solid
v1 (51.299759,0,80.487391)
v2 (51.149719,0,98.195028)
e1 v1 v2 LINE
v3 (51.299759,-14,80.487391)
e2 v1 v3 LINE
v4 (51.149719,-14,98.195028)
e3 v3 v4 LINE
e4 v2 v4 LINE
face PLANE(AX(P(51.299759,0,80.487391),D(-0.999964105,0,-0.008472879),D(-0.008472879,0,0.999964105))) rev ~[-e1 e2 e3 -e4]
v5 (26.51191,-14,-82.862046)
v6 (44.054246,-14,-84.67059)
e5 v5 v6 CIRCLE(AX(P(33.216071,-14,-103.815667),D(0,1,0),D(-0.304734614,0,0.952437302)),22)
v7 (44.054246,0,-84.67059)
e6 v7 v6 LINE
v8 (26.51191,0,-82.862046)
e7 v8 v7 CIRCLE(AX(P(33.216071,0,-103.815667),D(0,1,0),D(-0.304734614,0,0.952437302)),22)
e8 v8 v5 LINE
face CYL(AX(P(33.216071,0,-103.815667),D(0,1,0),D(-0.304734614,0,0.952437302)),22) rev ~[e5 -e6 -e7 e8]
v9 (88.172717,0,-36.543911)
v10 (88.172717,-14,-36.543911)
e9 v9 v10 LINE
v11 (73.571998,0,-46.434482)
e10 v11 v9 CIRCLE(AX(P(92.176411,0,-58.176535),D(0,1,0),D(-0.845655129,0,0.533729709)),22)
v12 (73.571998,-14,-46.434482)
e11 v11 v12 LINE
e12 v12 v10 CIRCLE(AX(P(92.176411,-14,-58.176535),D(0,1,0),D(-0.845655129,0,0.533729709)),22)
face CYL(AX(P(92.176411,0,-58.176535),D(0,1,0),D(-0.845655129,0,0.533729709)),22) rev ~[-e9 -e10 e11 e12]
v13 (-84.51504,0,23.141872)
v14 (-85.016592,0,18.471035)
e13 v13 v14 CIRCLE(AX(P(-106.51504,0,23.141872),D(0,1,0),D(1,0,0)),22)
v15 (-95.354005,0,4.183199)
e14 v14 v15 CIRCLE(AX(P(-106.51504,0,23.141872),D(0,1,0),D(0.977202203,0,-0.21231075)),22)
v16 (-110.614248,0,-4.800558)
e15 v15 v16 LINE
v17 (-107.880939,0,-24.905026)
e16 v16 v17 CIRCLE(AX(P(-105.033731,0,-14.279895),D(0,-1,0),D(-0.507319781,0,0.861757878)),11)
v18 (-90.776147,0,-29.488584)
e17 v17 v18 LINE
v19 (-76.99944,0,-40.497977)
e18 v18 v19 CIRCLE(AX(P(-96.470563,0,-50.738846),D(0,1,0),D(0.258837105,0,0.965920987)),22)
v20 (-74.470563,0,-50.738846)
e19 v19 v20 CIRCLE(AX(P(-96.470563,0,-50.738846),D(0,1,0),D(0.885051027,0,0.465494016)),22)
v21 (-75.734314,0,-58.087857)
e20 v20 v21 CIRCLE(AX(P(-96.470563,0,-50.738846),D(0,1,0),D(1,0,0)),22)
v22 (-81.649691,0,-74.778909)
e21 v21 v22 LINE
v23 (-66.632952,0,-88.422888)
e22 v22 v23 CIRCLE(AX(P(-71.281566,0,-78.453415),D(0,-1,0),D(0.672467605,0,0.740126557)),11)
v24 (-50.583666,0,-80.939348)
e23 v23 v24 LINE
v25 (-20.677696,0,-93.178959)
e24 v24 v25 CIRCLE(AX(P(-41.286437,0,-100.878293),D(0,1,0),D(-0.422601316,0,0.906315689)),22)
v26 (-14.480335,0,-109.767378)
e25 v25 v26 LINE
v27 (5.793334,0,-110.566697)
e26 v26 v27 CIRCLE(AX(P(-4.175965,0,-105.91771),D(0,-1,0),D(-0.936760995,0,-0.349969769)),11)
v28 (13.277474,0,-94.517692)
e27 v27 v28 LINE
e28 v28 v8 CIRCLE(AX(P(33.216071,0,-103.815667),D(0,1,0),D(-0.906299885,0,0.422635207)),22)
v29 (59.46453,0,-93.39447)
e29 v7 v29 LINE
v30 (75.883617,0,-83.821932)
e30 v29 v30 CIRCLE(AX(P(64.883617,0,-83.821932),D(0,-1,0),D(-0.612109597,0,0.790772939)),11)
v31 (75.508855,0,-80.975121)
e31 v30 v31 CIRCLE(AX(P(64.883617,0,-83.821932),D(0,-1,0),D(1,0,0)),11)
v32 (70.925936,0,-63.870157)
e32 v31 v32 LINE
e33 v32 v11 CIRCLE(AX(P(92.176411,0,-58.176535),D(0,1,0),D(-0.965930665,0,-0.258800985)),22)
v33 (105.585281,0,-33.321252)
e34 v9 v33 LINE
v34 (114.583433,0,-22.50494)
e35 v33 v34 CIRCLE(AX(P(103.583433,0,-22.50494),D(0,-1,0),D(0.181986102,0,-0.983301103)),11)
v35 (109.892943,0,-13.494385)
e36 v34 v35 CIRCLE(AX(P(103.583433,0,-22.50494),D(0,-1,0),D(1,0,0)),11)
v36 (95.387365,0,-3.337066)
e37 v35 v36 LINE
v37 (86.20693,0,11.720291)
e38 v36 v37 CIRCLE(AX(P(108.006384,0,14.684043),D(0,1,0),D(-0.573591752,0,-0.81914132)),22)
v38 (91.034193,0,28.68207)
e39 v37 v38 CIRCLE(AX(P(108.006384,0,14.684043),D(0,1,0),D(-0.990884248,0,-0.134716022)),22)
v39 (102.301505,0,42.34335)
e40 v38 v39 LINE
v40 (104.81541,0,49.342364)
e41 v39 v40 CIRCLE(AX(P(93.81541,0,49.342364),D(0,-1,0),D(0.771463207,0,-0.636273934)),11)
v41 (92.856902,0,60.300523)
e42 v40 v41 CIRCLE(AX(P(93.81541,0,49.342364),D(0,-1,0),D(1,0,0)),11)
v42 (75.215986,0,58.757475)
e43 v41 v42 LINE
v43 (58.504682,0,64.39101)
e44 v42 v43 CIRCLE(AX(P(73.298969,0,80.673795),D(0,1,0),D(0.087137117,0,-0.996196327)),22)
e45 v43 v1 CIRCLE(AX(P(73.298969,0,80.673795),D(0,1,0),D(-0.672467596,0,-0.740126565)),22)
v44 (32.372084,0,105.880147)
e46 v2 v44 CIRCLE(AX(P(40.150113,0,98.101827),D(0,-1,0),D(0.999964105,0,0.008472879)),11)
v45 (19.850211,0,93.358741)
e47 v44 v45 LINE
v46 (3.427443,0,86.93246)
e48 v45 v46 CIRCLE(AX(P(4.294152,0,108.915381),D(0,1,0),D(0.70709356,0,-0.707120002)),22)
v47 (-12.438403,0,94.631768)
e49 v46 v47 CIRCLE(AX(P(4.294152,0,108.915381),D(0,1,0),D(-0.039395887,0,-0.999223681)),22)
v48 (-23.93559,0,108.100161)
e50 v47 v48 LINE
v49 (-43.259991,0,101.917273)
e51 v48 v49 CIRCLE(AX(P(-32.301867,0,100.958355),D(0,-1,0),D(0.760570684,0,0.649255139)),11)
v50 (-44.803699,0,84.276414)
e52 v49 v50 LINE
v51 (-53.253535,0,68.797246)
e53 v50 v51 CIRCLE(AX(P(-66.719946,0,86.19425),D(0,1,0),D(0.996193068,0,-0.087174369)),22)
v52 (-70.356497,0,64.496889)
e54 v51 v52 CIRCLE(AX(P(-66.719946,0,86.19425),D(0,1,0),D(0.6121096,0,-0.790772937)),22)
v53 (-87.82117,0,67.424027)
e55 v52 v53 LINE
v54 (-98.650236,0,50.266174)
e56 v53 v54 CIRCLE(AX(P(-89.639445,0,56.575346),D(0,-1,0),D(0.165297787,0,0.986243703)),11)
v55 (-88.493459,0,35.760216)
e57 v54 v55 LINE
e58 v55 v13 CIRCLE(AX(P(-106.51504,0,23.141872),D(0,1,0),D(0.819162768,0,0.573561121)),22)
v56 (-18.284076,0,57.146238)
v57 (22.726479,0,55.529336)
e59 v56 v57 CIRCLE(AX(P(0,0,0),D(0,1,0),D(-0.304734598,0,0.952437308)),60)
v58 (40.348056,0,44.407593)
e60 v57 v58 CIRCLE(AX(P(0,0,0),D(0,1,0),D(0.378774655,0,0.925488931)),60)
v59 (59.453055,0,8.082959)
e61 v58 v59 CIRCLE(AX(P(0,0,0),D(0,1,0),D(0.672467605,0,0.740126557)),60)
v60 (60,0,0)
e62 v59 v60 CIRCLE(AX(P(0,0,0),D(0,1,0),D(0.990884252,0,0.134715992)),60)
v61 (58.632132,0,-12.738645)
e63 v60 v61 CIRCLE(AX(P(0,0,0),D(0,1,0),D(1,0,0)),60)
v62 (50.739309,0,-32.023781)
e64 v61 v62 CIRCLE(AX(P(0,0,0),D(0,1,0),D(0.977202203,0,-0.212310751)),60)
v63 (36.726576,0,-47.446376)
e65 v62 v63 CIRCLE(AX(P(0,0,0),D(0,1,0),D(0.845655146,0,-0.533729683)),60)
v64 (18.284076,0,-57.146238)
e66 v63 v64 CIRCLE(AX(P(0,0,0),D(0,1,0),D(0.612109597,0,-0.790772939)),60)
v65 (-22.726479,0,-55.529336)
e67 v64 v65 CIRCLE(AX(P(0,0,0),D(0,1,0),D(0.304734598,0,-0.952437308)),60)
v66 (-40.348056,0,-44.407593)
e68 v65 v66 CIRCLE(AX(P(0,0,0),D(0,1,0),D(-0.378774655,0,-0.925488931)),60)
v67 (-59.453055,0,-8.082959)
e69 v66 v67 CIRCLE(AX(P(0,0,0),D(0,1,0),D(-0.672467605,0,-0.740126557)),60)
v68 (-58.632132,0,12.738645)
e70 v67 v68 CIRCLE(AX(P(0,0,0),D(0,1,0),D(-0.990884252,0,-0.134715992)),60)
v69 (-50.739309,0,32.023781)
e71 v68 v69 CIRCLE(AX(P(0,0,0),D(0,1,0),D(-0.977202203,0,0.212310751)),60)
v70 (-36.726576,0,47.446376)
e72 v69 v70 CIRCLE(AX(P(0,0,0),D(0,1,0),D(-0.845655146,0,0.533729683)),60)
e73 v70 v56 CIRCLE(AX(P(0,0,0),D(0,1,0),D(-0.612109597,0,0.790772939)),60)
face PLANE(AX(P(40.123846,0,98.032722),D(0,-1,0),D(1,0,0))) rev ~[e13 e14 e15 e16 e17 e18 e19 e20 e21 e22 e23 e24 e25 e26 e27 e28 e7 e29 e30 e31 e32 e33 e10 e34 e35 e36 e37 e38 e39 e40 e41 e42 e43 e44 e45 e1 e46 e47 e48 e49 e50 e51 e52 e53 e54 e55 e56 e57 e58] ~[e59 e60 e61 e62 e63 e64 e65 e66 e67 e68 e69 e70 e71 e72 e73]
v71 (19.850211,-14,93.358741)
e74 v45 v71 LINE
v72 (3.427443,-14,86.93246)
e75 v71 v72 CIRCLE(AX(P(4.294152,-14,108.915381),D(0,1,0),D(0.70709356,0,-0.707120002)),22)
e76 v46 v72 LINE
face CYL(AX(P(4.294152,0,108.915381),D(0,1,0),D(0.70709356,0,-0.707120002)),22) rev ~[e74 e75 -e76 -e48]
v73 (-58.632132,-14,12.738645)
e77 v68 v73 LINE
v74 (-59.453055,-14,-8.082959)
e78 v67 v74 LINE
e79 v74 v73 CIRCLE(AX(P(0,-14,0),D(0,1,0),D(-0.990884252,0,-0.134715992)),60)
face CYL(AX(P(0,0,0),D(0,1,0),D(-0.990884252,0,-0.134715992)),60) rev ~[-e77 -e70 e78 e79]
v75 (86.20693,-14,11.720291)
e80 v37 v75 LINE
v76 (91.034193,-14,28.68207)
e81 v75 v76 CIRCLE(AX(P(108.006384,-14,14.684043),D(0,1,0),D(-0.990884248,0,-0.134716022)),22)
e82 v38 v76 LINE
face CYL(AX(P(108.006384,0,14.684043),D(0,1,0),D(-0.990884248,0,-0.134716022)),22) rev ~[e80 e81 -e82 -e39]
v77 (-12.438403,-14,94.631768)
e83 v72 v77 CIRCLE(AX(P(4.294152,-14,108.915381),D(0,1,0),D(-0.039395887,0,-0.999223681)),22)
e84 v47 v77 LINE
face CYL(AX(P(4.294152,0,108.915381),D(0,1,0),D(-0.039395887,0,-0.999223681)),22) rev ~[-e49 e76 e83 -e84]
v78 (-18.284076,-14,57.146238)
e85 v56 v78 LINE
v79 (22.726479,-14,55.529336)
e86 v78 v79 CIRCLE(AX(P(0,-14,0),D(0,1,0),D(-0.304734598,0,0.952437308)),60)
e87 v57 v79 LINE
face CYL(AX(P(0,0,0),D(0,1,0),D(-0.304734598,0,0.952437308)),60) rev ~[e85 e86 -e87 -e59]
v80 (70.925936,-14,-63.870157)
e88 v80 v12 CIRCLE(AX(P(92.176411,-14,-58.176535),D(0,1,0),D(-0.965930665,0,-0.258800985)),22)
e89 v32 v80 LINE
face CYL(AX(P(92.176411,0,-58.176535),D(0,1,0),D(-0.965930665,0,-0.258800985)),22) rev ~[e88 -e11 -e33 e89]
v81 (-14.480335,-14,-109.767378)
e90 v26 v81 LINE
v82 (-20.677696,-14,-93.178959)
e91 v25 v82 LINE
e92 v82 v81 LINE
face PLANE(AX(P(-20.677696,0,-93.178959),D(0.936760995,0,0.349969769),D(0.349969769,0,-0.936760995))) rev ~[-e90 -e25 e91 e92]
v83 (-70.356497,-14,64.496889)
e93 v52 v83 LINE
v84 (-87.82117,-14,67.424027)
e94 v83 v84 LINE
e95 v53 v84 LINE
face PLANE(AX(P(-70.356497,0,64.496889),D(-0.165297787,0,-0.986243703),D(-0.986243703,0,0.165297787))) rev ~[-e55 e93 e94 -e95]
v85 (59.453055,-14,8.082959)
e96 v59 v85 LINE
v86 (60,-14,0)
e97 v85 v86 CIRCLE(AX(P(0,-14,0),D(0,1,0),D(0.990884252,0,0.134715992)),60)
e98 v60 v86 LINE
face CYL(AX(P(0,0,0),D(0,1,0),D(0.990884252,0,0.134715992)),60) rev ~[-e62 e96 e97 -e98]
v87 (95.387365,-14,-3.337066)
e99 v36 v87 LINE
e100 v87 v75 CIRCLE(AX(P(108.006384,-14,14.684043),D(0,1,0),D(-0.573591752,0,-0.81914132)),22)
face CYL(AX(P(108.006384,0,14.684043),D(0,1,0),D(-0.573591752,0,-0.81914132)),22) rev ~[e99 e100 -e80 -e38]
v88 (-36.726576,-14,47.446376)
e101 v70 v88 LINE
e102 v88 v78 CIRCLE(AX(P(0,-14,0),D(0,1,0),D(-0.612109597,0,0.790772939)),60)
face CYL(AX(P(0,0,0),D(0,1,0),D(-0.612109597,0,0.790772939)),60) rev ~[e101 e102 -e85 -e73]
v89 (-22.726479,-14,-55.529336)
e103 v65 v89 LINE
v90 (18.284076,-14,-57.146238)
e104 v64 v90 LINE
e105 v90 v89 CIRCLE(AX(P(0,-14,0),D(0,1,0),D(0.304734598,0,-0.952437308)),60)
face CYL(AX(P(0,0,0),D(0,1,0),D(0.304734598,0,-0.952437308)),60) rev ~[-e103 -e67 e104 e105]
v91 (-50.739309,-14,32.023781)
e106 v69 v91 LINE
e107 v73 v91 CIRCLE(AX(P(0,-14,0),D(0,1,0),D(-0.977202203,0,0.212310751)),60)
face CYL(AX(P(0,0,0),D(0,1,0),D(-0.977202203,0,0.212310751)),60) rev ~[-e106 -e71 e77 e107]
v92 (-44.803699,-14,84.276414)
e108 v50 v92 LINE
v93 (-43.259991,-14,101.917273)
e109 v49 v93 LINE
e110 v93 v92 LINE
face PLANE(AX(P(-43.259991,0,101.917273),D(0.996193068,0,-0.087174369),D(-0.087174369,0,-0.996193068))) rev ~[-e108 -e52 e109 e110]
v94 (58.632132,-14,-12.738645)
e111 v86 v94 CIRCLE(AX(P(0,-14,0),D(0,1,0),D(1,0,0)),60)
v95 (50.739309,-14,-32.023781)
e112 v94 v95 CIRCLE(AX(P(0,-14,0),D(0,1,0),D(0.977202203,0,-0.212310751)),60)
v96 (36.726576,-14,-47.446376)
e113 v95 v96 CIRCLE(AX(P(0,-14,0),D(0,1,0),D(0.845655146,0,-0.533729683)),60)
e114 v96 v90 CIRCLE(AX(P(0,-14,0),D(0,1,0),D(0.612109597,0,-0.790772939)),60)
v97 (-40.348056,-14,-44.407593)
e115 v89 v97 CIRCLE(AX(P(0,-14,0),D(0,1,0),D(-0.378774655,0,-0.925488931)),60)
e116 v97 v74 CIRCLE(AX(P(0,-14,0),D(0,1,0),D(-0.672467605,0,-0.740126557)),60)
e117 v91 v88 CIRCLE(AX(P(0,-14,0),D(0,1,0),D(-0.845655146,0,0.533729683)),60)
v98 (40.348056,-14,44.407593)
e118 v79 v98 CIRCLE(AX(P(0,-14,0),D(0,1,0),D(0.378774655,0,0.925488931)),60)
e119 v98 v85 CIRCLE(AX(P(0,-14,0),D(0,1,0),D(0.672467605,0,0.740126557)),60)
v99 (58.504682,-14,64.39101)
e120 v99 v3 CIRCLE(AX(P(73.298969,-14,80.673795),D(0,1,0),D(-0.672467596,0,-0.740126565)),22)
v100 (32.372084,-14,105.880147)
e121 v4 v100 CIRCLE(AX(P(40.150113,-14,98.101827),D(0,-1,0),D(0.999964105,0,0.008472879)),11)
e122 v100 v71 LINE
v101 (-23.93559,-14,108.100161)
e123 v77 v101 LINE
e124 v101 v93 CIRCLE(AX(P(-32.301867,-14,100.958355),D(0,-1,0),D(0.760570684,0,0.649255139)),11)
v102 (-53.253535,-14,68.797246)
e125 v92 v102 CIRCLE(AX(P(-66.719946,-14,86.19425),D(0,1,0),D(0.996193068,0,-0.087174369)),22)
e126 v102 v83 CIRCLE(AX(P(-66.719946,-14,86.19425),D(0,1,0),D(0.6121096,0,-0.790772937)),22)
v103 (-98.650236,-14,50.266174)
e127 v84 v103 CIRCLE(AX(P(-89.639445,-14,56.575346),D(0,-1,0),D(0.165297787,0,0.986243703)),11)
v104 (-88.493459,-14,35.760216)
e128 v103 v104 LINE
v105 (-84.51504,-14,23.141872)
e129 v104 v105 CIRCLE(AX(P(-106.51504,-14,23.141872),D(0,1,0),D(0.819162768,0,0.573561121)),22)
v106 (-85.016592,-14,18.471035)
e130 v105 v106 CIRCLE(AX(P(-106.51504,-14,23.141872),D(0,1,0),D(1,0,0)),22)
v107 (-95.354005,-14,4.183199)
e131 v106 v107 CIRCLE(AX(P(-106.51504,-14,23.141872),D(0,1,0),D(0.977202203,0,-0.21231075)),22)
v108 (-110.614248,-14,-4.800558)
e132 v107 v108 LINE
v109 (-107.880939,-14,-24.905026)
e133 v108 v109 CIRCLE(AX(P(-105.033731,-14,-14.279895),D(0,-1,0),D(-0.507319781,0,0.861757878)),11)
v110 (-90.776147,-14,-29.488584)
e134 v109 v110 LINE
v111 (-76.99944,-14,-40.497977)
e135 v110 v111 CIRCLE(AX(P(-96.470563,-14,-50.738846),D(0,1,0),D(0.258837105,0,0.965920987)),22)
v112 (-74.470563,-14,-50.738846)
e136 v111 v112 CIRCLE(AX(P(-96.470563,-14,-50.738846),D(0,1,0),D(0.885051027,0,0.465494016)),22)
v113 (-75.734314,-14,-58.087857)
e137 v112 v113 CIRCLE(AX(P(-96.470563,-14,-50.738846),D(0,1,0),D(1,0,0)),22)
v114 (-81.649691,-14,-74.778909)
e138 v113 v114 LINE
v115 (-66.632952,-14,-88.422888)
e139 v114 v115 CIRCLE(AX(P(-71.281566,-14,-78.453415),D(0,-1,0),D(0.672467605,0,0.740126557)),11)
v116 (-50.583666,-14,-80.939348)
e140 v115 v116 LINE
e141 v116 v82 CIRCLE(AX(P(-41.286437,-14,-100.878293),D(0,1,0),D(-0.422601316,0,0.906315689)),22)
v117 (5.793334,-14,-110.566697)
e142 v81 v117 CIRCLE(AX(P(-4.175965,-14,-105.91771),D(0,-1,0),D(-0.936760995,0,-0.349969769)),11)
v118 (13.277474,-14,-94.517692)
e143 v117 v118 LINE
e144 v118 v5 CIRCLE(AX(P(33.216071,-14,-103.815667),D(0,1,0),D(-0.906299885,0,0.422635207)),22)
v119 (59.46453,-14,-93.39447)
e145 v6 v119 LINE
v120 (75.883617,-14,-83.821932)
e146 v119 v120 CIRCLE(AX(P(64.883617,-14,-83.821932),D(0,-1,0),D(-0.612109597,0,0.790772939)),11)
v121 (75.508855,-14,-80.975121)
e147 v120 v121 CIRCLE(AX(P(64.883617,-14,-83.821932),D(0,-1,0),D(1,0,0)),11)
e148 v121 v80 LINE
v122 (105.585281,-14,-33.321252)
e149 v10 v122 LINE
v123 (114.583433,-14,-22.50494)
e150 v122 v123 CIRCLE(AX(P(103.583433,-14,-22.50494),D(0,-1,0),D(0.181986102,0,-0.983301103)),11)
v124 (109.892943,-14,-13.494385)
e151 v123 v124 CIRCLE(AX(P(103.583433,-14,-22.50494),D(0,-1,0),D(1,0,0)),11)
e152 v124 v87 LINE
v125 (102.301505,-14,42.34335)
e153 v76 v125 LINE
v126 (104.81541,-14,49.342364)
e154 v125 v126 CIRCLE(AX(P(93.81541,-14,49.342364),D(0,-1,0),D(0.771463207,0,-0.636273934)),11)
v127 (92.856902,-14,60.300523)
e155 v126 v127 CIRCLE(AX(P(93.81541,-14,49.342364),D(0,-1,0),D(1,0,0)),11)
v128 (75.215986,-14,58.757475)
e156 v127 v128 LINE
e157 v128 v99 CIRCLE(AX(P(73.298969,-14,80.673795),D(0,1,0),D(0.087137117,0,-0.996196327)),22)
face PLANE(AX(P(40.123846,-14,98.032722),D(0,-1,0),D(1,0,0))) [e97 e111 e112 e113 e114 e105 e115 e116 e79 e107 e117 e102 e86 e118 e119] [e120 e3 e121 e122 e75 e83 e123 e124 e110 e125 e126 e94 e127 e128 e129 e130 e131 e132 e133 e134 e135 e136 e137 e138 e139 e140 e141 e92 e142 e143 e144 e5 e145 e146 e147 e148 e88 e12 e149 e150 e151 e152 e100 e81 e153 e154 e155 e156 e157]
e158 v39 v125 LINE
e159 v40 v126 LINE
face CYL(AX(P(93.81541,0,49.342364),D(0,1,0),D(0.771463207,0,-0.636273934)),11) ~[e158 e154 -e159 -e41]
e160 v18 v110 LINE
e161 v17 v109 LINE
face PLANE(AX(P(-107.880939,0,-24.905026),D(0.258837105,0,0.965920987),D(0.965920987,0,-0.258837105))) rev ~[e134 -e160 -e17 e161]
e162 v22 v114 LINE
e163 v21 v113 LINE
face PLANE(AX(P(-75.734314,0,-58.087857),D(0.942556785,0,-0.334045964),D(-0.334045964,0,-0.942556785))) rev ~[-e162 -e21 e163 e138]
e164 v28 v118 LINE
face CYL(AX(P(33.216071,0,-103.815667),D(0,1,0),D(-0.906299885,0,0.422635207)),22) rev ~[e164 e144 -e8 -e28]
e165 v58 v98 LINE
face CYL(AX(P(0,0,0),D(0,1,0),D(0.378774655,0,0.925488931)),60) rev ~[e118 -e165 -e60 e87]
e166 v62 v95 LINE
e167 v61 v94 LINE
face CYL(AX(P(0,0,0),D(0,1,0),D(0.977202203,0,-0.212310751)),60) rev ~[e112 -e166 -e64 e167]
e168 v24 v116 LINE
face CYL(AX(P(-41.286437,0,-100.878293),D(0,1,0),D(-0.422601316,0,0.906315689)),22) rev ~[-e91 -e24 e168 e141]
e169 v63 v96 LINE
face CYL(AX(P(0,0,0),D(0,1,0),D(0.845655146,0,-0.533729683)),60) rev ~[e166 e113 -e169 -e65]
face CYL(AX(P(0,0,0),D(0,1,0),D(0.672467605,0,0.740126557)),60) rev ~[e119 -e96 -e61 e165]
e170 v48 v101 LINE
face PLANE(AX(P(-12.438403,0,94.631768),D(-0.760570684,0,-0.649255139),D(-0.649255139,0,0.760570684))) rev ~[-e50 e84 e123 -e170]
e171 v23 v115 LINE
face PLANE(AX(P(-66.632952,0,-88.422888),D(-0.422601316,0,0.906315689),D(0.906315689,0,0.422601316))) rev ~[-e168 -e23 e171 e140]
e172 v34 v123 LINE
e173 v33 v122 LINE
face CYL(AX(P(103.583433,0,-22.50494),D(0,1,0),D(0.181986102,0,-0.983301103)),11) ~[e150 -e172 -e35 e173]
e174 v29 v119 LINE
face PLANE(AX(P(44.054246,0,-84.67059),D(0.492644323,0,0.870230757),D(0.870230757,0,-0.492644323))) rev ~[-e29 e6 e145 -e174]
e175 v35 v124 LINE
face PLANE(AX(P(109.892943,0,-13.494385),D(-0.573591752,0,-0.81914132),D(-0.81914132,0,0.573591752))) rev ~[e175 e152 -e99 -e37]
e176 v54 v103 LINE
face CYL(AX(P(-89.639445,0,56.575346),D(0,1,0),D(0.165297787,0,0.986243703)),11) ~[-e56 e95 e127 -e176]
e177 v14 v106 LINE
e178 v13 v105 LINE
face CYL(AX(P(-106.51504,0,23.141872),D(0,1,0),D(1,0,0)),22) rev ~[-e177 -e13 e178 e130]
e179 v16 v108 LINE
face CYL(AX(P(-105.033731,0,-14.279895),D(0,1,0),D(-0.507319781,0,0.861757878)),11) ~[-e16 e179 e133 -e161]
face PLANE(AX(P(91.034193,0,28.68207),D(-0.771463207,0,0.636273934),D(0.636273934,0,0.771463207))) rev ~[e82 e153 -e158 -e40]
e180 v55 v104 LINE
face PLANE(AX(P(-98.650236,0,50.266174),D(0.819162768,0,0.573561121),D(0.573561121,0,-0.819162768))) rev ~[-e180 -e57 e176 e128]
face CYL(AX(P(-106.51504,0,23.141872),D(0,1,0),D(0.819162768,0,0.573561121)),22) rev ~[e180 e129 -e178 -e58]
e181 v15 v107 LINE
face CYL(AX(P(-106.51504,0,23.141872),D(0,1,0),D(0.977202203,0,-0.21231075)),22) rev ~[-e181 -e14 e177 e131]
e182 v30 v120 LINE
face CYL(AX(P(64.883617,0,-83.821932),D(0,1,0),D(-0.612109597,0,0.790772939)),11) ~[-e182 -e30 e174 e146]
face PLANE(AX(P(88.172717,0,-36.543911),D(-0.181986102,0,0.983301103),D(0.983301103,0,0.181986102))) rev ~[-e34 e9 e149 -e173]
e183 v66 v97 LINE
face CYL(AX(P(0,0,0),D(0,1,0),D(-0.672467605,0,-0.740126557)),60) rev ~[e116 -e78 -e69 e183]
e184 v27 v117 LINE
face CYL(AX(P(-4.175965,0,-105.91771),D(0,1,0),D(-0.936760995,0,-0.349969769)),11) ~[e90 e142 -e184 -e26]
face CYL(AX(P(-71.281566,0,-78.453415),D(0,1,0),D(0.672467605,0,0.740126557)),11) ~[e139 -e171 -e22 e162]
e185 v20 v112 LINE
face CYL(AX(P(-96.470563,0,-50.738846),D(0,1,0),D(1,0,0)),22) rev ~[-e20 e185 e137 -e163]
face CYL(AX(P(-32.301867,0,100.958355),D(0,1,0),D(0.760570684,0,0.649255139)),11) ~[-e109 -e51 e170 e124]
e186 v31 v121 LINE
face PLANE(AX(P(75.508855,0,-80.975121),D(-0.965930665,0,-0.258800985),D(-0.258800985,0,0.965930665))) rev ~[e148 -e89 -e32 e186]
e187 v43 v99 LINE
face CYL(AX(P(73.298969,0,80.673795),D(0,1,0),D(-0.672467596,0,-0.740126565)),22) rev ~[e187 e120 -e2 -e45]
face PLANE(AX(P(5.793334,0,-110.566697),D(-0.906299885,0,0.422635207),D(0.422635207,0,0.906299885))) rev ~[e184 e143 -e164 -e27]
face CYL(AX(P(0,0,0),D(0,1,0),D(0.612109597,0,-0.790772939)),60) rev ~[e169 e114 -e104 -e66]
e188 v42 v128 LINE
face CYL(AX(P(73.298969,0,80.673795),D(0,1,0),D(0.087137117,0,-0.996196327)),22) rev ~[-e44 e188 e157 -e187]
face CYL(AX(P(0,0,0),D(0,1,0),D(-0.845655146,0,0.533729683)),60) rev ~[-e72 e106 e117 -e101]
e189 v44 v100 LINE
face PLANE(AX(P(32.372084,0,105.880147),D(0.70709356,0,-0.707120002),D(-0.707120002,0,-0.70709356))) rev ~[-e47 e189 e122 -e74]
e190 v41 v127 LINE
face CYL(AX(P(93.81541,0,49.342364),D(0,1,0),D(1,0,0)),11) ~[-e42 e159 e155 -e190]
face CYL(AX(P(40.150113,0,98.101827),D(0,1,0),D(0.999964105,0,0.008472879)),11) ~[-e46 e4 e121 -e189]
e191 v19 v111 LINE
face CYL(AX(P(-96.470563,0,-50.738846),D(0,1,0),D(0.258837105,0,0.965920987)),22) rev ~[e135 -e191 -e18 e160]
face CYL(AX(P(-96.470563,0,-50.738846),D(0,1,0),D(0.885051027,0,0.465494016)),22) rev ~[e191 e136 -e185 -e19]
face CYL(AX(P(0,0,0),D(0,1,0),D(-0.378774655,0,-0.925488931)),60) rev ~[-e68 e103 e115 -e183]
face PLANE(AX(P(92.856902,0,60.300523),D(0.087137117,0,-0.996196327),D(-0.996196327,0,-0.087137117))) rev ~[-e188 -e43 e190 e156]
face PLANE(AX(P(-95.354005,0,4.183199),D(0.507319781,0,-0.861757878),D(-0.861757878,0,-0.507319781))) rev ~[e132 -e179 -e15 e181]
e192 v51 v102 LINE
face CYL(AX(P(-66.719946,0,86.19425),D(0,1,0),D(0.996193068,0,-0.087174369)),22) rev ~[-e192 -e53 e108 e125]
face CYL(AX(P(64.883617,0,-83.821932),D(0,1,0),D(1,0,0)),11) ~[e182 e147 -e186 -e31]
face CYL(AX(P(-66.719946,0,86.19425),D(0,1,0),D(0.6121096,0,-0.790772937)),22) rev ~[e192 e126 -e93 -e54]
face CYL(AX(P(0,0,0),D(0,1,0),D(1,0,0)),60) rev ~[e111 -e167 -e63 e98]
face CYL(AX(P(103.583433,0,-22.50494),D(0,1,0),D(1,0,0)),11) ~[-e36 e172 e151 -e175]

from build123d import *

# Parameters (mm, degrees)
F1_DEPTH = 14


# Not quite as in the source:
# - ends of sketch curves that miss each other by under 0.0002 mm in the source are joined


with BuildPart() as f1:
    # F0 (on Front) → F1 (new body)
    with BuildSketch(Plane.XZ):
        with BuildLine():
            ThreePointArc((32.3720842786, 105.8801466631), (29.3660148862, 95.9331361741), (35.9835922354, 87.9214484062))
            ThreePointArc((35.9835922354, 87.9214484062), (46.2807034104, 88.9685979346), (51.1501134416, 98.1018266427))
            ThreePointArc((51.1501134416, 98.1018266427), (51.1500147285, 98.1484278976), (51.1497185912, 98.1950283161))
            ThreePointArc((51.1497185912, 98.1950283161), (44.3166346477, 108.2822048792), (32.3720842786, 105.8801466631))
        make_face()
        with BuildLine():
            ThreePointArc((32.9533949945, 80.5175369614), (46.4344825558, 73.5719975927), (58.5046818367, 64.3910102669))
            ThreePointArc((58.5046818367, 64.3910102669), (53.2187863313, 71.68567665), (51.2997586494, 80.4873913517))
            Line((51.2997586494, 80.4873913517), (51.1497185912, 98.1950283161))
            ThreePointArc((51.1497185912, 98.1950283161), (51.1500147285, 98.1484278976), (51.1501134416, 98.1018266427))
            ThreePointArc((51.1501134416, 98.1018266427), (46.2807034104, 88.9685979346), (35.9835922354, 87.9214484062))
            Line((35.9835922354, 87.9214484062), (32.9533949945, 80.5175369614))
        make_face()
        with BuildLine():
            ThreePointArc((3.4274426795, 86.9324602015), (18.4710353665, 85.0165916306), (32.9533949945, 80.5175369614))
            Line((32.9533949945, 80.5175369614), (35.9835922354, 87.9214484062))
            ThreePointArc((35.9835922354, 87.9214484062), (29.3660148862, 95.9331361741), (32.3720842786, 105.8801466631))
            Line((32.3720842786, 105.8801466631), (19.8502105167, 93.3587411362))
            ThreePointArc((19.8502105167, 93.3587411362), (12.3109167385, 88.4280317588), (3.4274426795, 86.9324602015))
        make_face()
        with BuildLine():
            Line((22.7264793065, 55.5293358355), (32.9533949945, 80.5175369614))
            ThreePointArc((32.9533949945, 80.5175369614), (18.4710353665, 85.0165916306), (3.4274426795, 86.9324602015))
            Line((3.4274426795, 86.9324602015), (2.3637534996, 59.9534208315))
            ThreePointArc((2.3637534996, 59.9534208315), (12.7386450449, 58.6321321668), (22.7264793065, 55.5293358355))
        make_face()
        with BuildLine():
            Line((40.348056302, 44.407593412), (58.5046816379, 64.3910104474))
            ThreePointArc((58.5046816379, 64.3910104474), (46.4344825558, 73.5719975927), (32.9533949945, 80.5175369614))
            Line((32.9533949945, 80.5175369614), (22.7264793065, 55.5293358355))
            ThreePointArc((22.7264793065, 55.5293358355), (32.0237809946, 50.739308734), (40.348056302, 44.407593412))
        make_face()
        with BuildLine():
            ThreePointArc((58.5046818367, 64.3910102669), (68.7972457691, 53.2535348554), (76.9994402387, 40.4979777634))
            Line((76.9994402387, 40.4979777634), (84.0798485365, 44.2219297416))
            ThreePointArc((84.0798485365, 44.2219297416), (84.1603038112, 54.6129353624), (92.8569016607, 60.3005233139))
            Line((92.8569016607, 60.3005233139), (75.2159855194, 58.7574754942))
            ThreePointArc((75.2159855194, 58.7574754942), (66.2711525981, 59.8264975753), (58.5046818367, 64.3910102669))
        make_face()
        with BuildLine():
            ThreePointArc((92.8569016607, 60.3005233139), (84.1603038112, 54.6129353624), (84.0798485365, 44.2219297416))
            ThreePointArc((84.0798485365, 44.2219297416), (92.687333506, 38.4003600768), (102.3015052283, 42.3433504341))
            ThreePointArc((102.3015052283, 42.3433504341), (104.1678745826, 45.6239667523), (104.815409946, 49.3423637117))
            ThreePointArc((104.815409946, 49.3423637117), (101.2469780464, 57.4523449428), (92.8569016607, 60.3005233139))
        make_face()
        with BuildLine():
            ThreePointArc((76.9994402387, 40.4979777634), (82.8620458637, 26.5119096875), (86.2069300455, 11.7202906163))
            ThreePointArc((86.2069300455, 11.7202906163), (86.8466202271, 20.7060376023), (91.0341929436, 28.6820696464))
            Line((91.0341929436, 28.6820696464), (102.3015052283, 42.3433504341))
            ThreePointArc((102.3015052283, 42.3433504341), (92.687333506, 38.4003600768), (84.0798485365, 44.2219297416))
            Line((84.0798485365, 44.2219297416), (76.9994402387, 40.4979777634))
        make_face()
        with BuildLine():
            Line((53.1030622336, 27.9296398368), (76.9994402387, 40.4979777634))
            ThreePointArc((76.9994402387, 40.4979777634), (68.7972457691, 53.2535348554), (58.5046818367, 64.3910102669))
            Line((58.5046818367, 64.3910102669), (40.348056302, 44.407593412))
            ThreePointArc((40.348056302, 44.407593412), (47.4463763358, 36.7265758355), (53.1030622336, 27.9296398368))
        make_face()
        with BuildLine():
            Line((59.4530551421, 8.0829594997), (86.206929956, 11.7202912746))
            ThreePointArc((86.206929956, 11.7202912746), (82.8620458637, 26.5119096875), (76.9994402387, 40.4979777634))
            Line((76.9994402387, 40.4979777634), (53.1030622336, 27.9296398368))
            ThreePointArc((53.1030622336, 27.9296398368), (57.1462384569, 18.2840758647), (59.4530551421, 8.0829594997))
        make_face()
        with BuildLine():
            ThreePointArc((85.0165916418, -18.4710353151), (86.5027267571, -9.2886093459), (87, 0))
            ThreePointArc((87, 0), (86.8015060755, 5.8735460346), (86.2069300455, 11.7202906163))
            Line((86.2069300455, 11.7202906163), (59.4530551421, 8.0829594997))
            ThreePointArc((59.4530551421, 8.0829594997), (59.8631076228, 4.0507216317), (60, 0))
            ThreePointArc((60, 0), (59.657052936, -6.40593748), (58.6321321668, -12.7386450449))
            Line((58.6321321668, -12.7386450449), (85.0165916418, -18.4710353151))
        make_face()
        with BuildLine():
            ThreePointArc((86.2069300455, 11.7202906163), (86.8015060755, 5.8735460346), (87, 0))
            ThreePointArc((87, 0), (86.5027267571, -9.2886093459), (85.0165916418, -18.4710353151))
            Line((85.0165916418, -18.4710353151), (92.834209264, -20.169521321))
            ThreePointArc((92.834209264, -20.169521321), (99.5750512453, -12.2612648605), (109.8929427662, -13.4943850596))
            Line((109.8929427662, -13.4943850596), (95.3873649649, -3.3370659482))
            ThreePointArc((95.3873649649, -3.3370659482), (89.2223796623, 3.2314800802), (86.2069300455, 11.7202906163))
        make_face()
        with BuildLine():
            ThreePointArc((109.8929427662, -13.4943850596), (99.5750512453, -12.2612648605), (92.834209264, -20.169521321))
            ThreePointArc((92.834209264, -20.169521321), (95.6858924447, -30.1618871019), (105.5852806145, -33.32125171))
            ThreePointArc((105.5852806145, -33.32125171), (112.0398014596, -29.5398412019), (114.5834334946, -22.5049395793))
            ThreePointArc((114.5834334946, -22.5049395793), (113.3406001425, -17.4257960485), (109.8929427662, -13.4943850596))
        make_face()
        with BuildLine():
            Line((92.834209264, -20.169521321), (85.0165916418, -18.4710353151))
            ThreePointArc((85.0165916418, -18.4710353151), (80.5175370893, -32.953394682), (73.5719980248, -46.4344818712))
            ThreePointArc((73.5719980248, -46.4344818712), (79.8379557996, -39.9621860052), (88.1727166272, -36.5439112122))
            Line((88.1727166272, -36.5439112122), (105.5852806145, -33.32125171))
            ThreePointArc((105.5852806145, -33.32125171), (95.6858924447, -30.1618871019), (92.834209264, -20.169521321))
        make_face()
        with BuildLine():
            ThreePointArc((73.5719980248, -46.4344818712), (80.5175370893, -32.953394682), (85.0165916418, -18.4710353151))
            Line((85.0165916418, -18.4710353151), (58.6321321668, -12.7386450449))
            ThreePointArc((58.6321321668, -12.7386450449), (55.5293358355, -22.7264793065), (50.739308734, -32.0237809946))
            Line((50.739308734, -32.0237809946), (73.5719980248, -46.4344818712))
        make_face()
        with BuildLine():
            ThreePointArc((53.2535349615, -68.7972456869), (64.3910106745, -58.5046813881), (73.5719980248, -46.4344818712))
            Line((73.5719980248, -46.4344818712), (50.739308734, -32.0237809946))
            ThreePointArc((50.739308734, -32.0237809946), (44.407593412, -40.348056302), (36.7265758355, -47.4463763358))
            Line((36.7265758355, -47.4463763358), (53.2535349615, -68.7972456869))
        make_face()
        with BuildLine():
            ThreePointArc((70.9259362309, -63.8701571461), (70.4254635991, -54.875582133), (73.5719980248, -46.4344818712))
            ThreePointArc((73.5719980248, -46.4344818712), (64.3910106745, -58.5046813881), (53.2535349615, -68.7972456869))
            Line((53.2535349615, -68.7972456869), (58.1504117396, -75.1234291983))
            ThreePointArc((58.1504117396, -75.1234291983), (68.3975255483, -73.3982829864), (75.5088546274, -80.9751206903))
            Line((75.5088546274, -80.9751206903), (70.9259362309, -63.8701571461))
        make_face()
        with BuildLine():
            ThreePointArc((75.5088546274, -80.9751206903), (68.3975255483, -73.3982829864), (58.1504117396, -75.1234291983))
            ThreePointArc((58.1504117396, -75.1234291983), (53.9119588783, -84.6110520937), (59.4645297515, -93.3944698544))
            ThreePointArc((59.4645297515, -93.3944698544), (70.4239258235, -93.3248248527), (75.8836173094, -83.8219315266))
            ThreePointArc((75.8836173094, -83.8219315266), (75.7895242066, -82.3862453661), (75.5088546274, -80.9751206903))
        make_face()
        with BuildLine():
            Line((58.1504117396, -75.1234291983), (53.2535349615, -68.7972456869))
            ThreePointArc((53.2535349615, -68.7972456869), (40.4979775935, -76.9994403281), (26.5119096382, -82.8620458795))
            ThreePointArc((26.5119096382, -82.8620458795), (35.4722238433, -81.9316592406), (44.0542462703, -84.6705898743))
            Line((44.0542462703, -84.6705898743), (59.4645297515, -93.3944698544))
            ThreePointArc((59.4645297515, -93.3944698544), (53.9119588783, -84.6110520937), (58.1504117396, -75.1234291983))
        make_face()
        with BuildLine():
            ThreePointArc((26.5119096382, -82.8620458795), (40.4979775935, -76.9994403281), (53.2535349615, -68.7972456869))
            Line((53.2535349615, -68.7972456869), (36.7265758355, -47.4463763358))
            ThreePointArc((36.7265758355, -47.4463763358), (27.9296398368, -53.1030622336), (18.2840758647, -57.1462384569))
            Line((18.2840758647, -57.1462384569), (26.5119096382, -82.8620458795))
        make_face()
        with BuildLine():
            ThreePointArc((18.2840758647, -57.1462384569), (8.0829594997, -59.4530551421), (-2.3637534996, -59.9534208315))
            Line((-2.3637534996, -59.9534208315), (-3.4274425744, -86.9324602056))
            ThreePointArc((-3.4274425744, -86.9324602056), (11.7202910843, -86.2069299819), (26.5119096382, -82.8620458795))
            Line((26.5119096382, -82.8620458795), (18.2840758647, -57.1462384569))
        make_face()
        with BuildLine():
            ThreePointArc((6.8240354841, -105.9177101356), (3.7539441497, -98.2942890824), (-3.7426097076, -94.9262496498))
            ThreePointArc((-3.7426097076, -94.9262496498), (-13.087979412, -99.4697654637), (-14.4803354569, -109.7673775901))
            ThreePointArc((-14.4803354569, -109.7673775901), (-4.6093193242, -116.9091706213), (5.793334221, -110.5666974118))
            ThreePointArc((5.793334221, -110.5666974118), (6.5632693047, -108.2986462849), (6.8240354841, -105.9177101356))
        make_face()
        with BuildLine():
            ThreePointArc((13.2774736805, -94.5176919775), (18.6756903773, -87.3057505138), (26.5119096382, -82.8620458795))
            ThreePointArc((26.5119096382, -82.8620458795), (11.7202910843, -86.2069299819), (-3.4274425744, -86.9324602056))
            Line((-3.4274425744, -86.9324602056), (-3.7426097076, -94.9262496498))
            ThreePointArc((-3.7426097076, -94.9262496498), (3.7539441497, -98.2942890824), (6.8240354841, -105.9177101356))
            ThreePointArc((6.8240354841, -105.9177101356), (6.5632693047, -108.2986462849), (5.793334221, -110.5666974118))
            Line((5.793334221, -110.5666974118), (13.2774736805, -94.5176919775))
        make_face()
        with BuildLine():
            Line((-3.7426097076, -94.9262496498), (-3.4274425744, -86.9324602056))
            ThreePointArc((-3.4274425744, -86.9324602056), (-18.4710353211, -85.0165916405), (-32.9533950059, -80.5175369568))
            ThreePointArc((-32.9533950059, -80.5175369568), (-25.4913553114, -85.5643983847), (-20.6776955249, -93.1789585254))
            Line((-20.6776955249, -93.1789585254), (-14.4803354569, -109.7673775901))
            ThreePointArc((-14.4803354569, -109.7673775901), (-13.087979412, -99.4697654637), (-3.7426097076, -94.9262496498))
        make_face()
        with BuildLine():
            ThreePointArc((-32.9533950059, -80.5175369568), (-46.4344824475, -73.571997661), (-58.5046816379, -64.3910104474))
            Line((-58.5046816379, -64.3910104474), (-63.8844224782, -70.3120229024))
            ThreePointArc((-63.8844224782, -70.3120229024), (-61.2225259157, -74.0019310175), (-60.2815661336, -78.4534150279))
            ThreePointArc((-60.2815661336, -78.4534150279), (-62.0043154825, -84.3637974485), (-66.6329516532, -88.4228876024))
            Line((-66.6329516532, -88.4228876024), (-50.5836663677, -80.9393482856))
            ThreePointArc((-50.5836663677, -80.9393482856), (-41.812645664, -78.8845874059), (-32.9533950059, -80.5175369568))
        make_face()
        with BuildLine():
            ThreePointArc((-60.2815661336, -78.4534150279), (-61.2225259157, -74.0019310175), (-63.8844224782, -70.3120229024))
            ThreePointArc((-63.8844224782, -70.3120229024), (-73.9639066787, -67.7854700899), (-81.649690774, -74.7789094228))
            ThreePointArc((-81.649690774, -74.7789094228), (-78.678709789, -86.5948071535), (-66.6329516532, -88.4228876024))
            ThreePointArc((-66.6329516532, -88.4228876024), (-62.0043154825, -84.3637974485), (-60.2815661336, -78.4534150279))
        make_face()
        with BuildLine():
            Line((-63.8844224782, -70.3120229024), (-58.5046816379, -64.3910104474))
            ThreePointArc((-58.5046816379, -64.3910104474), (-68.7972458297, -53.253534777), (-76.999440456, -40.4979773503))
            ThreePointArc((-76.999440456, -40.4979773503), (-75.1121373522, -45.464601551), (-74.4705630577, -50.7388457036))
            ThreePointArc((-74.4705630577, -50.7388457036), (-74.7888024722, -54.4672847753), (-75.734313777, -58.0878569137))
            Line((-75.734313777, -58.0878569137), (-81.649690774, -74.7789094228))
            ThreePointArc((-81.649690774, -74.7789094228), (-73.9639066787, -67.7854700899), (-63.8844224782, -70.3120229024))
        make_face()
        with BuildLine():
            ThreePointArc((-76.999440456, -40.4979773503), (-82.8620458336, -26.5119097816), (-86.206929956, -11.7202912746))
            Line((-86.206929956, -11.7202912746), (-94.1340039749, -12.7980192079))
            ThreePointArc((-94.1340039749, -12.7980192079), (-94.0588276868, -13.537262817), (-94.033730751, -14.2798951161))
            ThreePointArc((-94.033730751, -14.2798951161), (-98.3374366156, -23.0068444601), (-107.880938906, -24.9050259728))
            Line((-107.880938906, -24.9050259728), (-90.7761467477, -29.4885839902))
            ThreePointArc((-90.7761467477, -29.4885839902), (-82.7363804202, -33.5524491272), (-76.999440456, -40.4979773503))
        make_face()
        with BuildLine():
            ThreePointArc((-94.033730751, -14.2798951161), (-94.0588276868, -13.537262817), (-94.1340039749, -12.7980192079))
            ThreePointArc((-94.1340039749, -12.7980192079), (-100.2312999932, -4.3835999095), (-110.6142483426, -4.8005584616))
            ThreePointArc((-110.6142483426, -4.8005584616), (-115.933457527, -15.7617710244), (-107.880938906, -24.9050259728))
            ThreePointArc((-107.880938906, -24.9050259728), (-98.3374366156, -23.0068444601), (-94.033730751, -14.2798951161))
        make_face()
        with BuildLine():
            Line((-94.1340039749, -12.7980192079), (-86.206929956, -11.7202912746))
            ThreePointArc((-86.206929956, -11.7202912746), (-86.9324602051, 3.4274425869), (-85.0165916365, 18.4710353397))
            ThreePointArc((-85.0165916365, 18.4710353397), (-88.6910103034, 10.2459824979), (-95.3540049197, 4.1831985225))
            Line((-95.3540049197, 4.1831985225), (-110.6142483426, -4.8005584616))
            ThreePointArc((-110.6142483426, -4.8005584616), (-100.2312999932, -4.3835999095), (-94.1340039749, -12.7980192079))
        make_face()
        with BuildLine():
            ThreePointArc((-98.6502358817, 50.2661740979), (-89.3763413047, 45.5784934095), (-80.3372388289, 50.7043199082))
            ThreePointArc((-80.3372388289, 50.7043199082), (-79.0724148015, 53.5195545963), (-78.6394454301, 56.5753464239))
            ThreePointArc((-78.6394454301, 56.5753464239), (-81.2429868836, 63.6816453112), (-87.8211697714, 67.424027156))
            ThreePointArc((-87.8211697714, 67.424027156), (-98.9416520314, 62.4463729395), (-98.6502358817, 50.2661740979))
        make_face()
        with BuildLine():
            ThreePointArc((-85.0165916365, 18.4710353397), (-80.5175369567, 32.9533950061), (-73.5719976643, 46.4344824422))
            Line((-73.5719976643, 46.4344824422), (-80.3372388289, 50.7043199082))
            ThreePointArc((-80.3372388289, 50.7043199082), (-89.3763413047, 45.5784934095), (-98.6502358817, 50.2661740979))
            Line((-98.6502358817, 50.2661740979), (-88.4934591999, 35.7602164834))
            ThreePointArc((-88.4934591999, 35.7602164834), (-85.533205342, 29.7572032719), (-84.515040103, 23.1418718315))
            ThreePointArc((-84.515040103, 23.1418718315), (-84.6407873584, 20.7930281014), (-85.0165916365, 18.4710353397))
        make_face()
        with BuildLine():
            Line((-80.3372388289, 50.7043199082), (-73.5719976643, 46.4344824422))
            ThreePointArc((-73.5719976643, 46.4344824422), (-64.3910104254, 58.5046816622), (-53.2535349098, 68.7972457269))
            ThreePointArc((-53.2535349098, 68.7972457269), (-61.3552649793, 64.8583604753), (-70.3564974187, 64.496888879))
            Line((-70.3564974187, 64.496888879), (-87.8211697714, 67.424027156))
            ThreePointArc((-87.8211697714, 67.424027156), (-81.2429868836, 63.6816453112), (-78.6394454301, 56.5753464239))
            ThreePointArc((-78.6394454301, 56.5753464239), (-79.0724148015, 53.5195545963), (-80.3372388289, 50.7043199082))
        make_face()
        with BuildLine():
            ThreePointArc((-53.2535349098, 68.7972457269), (-40.4979777344, 76.999440254), (-26.5119100039, 82.8620457625))
            Line((-26.5119100039, 82.8620457625), (-28.9497867858, 90.4815442234))
            ThreePointArc((-28.9497867858, 90.4815442234), (-39.1689587709, 92.3651563918), (-43.259991113, 101.917272662))
            Line((-43.259991113, 101.917272662), (-44.8036985972, 84.2764142338))
            ThreePointArc((-44.8036985972, 84.2764142338), (-47.4097338159, 75.6531070707), (-53.2535349098, 68.7972457269))
        make_face()
        with BuildLine():
            ThreePointArc((-26.5119100039, 82.8620457625), (-11.7202912224, 86.2069299631), (3.4274426795, 86.9324602015))
            ThreePointArc((3.4274426795, 86.9324602015), (-5.3107092774, 89.1227907409), (-12.4384028502, 94.6317681259))
            Line((-12.4384028502, 94.6317681259), (-23.9355898405, 108.1001611328))
            ThreePointArc((-23.9355898405, 108.1001611328), (-21.9812798602, 104.7643332773), (-21.301867361, 100.9583546072))
            ThreePointArc((-21.301867361, 100.9583546072), (-23.4172490145, 94.4727122461), (-28.9497867858, 90.4815442234))
            Line((-28.9497867858, 90.4815442234), (-26.5119100039, 82.8620457625))
        make_face()
        with BuildLine():
            ThreePointArc((-43.259991113, 101.917272662), (-39.1689587709, 92.3651563918), (-28.9497867858, 90.4815442234))
            ThreePointArc((-28.9497867858, 90.4815442234), (-23.4172490145, 94.4727122461), (-21.301867361, 100.9583546072))
            ThreePointArc((-21.301867361, 100.9583546072), (-21.9812798602, 104.7643332773), (-23.9355898405, 108.1001611328))
            ThreePointArc((-23.9355898405, 108.1001611328), (-35.6539479362, 111.4351649909), (-43.259991113, 101.917272662))
        make_face()
        with BuildLine():
            Line((-26.5119100039, 82.8620457625), (-18.2840758647, 57.1462384569))
            ThreePointArc((-18.2840758647, 57.1462384569), (-8.0829594997, 59.4530551421), (2.3637534996, 59.9534208315))
            Line((2.3637534996, 59.9534208315), (3.4274425744, 86.9324602056))
            ThreePointArc((3.4274425744, 86.9324602056), (-11.7202912224, 86.2069299631), (-26.5119100039, 82.8620457625))
        make_face()
        with BuildLine():
            ThreePointArc((-36.7265758355, 47.4463763358), (-27.9296398368, 53.1030622336), (-18.2840758647, 57.1462384569))
            Line((-18.2840758647, 57.1462384569), (-26.5119100039, 82.8620457625))
            ThreePointArc((-26.5119100039, 82.8620457625), (-40.4979777344, 76.999440254), (-53.2535349098, 68.7972457269))
            Line((-53.2535349615, 68.7972456869), (-36.7265758355, 47.4463763358))
        make_face()
        with BuildLine():
            Line((-73.5719976643, 46.4344824422), (-50.739308734, 32.0237809946))
            ThreePointArc((-50.739308734, 32.0237809946), (-44.407593412, 40.348056302), (-36.7265758355, 47.4463763358))
            Line((-36.7265758355, 47.4463763358), (-53.2535349615, 68.7972456869))
            ThreePointArc((-53.2535349098, 68.7972457269), (-64.3910104254, 58.5046816622), (-73.5719976643, 46.4344824422))
        make_face()
        with BuildLine():
            ThreePointArc((-58.6321321668, 12.7386450449), (-55.5293358355, 22.7264793065), (-50.739308734, 32.0237809946))
            Line((-50.739308734, 32.0237809946), (-73.5719976643, 46.4344824422))
            ThreePointArc((-73.5719976643, 46.4344824422), (-80.5175369567, 32.9533950061), (-85.0165916365, 18.4710353397))
            Line((-85.0165916418, 18.4710353151), (-58.6321321668, 12.7386450449))
        make_face()
        with BuildLine():
            Line((-86.206929956, -11.7202912746), (-59.4530551421, -8.0829594997))
            ThreePointArc((-59.4530551421, -8.0829594997), (-59.9534208315, 2.3637534996), (-58.6321321668, 12.7386450449))
            Line((-58.6321321668, 12.7386450449), (-85.0165916418, 18.4710353151))
            ThreePointArc((-85.0165916365, 18.4710353397), (-86.9324602051, 3.4274425869), (-86.206929956, -11.7202912746))
        make_face()
        with BuildLine():
            ThreePointArc((-53.1030622336, -27.9296398368), (-57.1462384569, -18.2840758647), (-59.4530551421, -8.0829594997))
            Line((-59.4530551421, -8.0829594997), (-86.206929956, -11.7202912746))
            ThreePointArc((-86.206929956, -11.7202912746), (-82.8620458336, -26.5119097816), (-76.999440456, -40.4979773503))
            Line((-76.999440456, -40.4979773503), (-53.1030622336, -27.9296398368))
        make_face()
        with BuildLine():
            Line((-58.5046816379, -64.3910104474), (-40.348056302, -44.407593412))
            ThreePointArc((-40.348056302, -44.407593412), (-47.4463763358, -36.7265758355), (-53.1030622336, -27.9296398368))
            Line((-53.1030622336, -27.9296398368), (-76.9994402387, -40.4979777634))
            ThreePointArc((-76.9994402387, -40.4979777634), (-68.7972458297, -53.253534777), (-58.5046816379, -64.3910104474))
        make_face()
        with BuildLine():
            ThreePointArc((-22.7264793065, -55.5293358355), (-32.0237809946, -50.739308734), (-40.348056302, -44.407593412))
            Line((-40.348056302, -44.407593412), (-58.5046816379, -64.3910104474))
            ThreePointArc((-58.5046816379, -64.3910104474), (-46.4344824475, -73.571997661), (-32.9533950059, -80.5175369568))
            Line((-32.9533949945, -80.5175369614), (-22.7264793065, -55.5293358355))
        make_face()
        with BuildLine():
            Line((-3.4274425744, -86.9324602056), (-2.3637534996, -59.9534208315))
            ThreePointArc((-2.3637534996, -59.9534208315), (-12.7386450449, -58.6321321668), (-22.7264793065, -55.5293358355))
            Line((-22.7264793065, -55.5293358355), (-32.9533949945, -80.5175369614))
            ThreePointArc((-32.9533950059, -80.5175369568), (-18.4710353211, -85.0165916405), (-3.4274425744, -86.9324602056))
        make_face()
    extrude(amount=F1_DEPTH)


solid = f1.part
